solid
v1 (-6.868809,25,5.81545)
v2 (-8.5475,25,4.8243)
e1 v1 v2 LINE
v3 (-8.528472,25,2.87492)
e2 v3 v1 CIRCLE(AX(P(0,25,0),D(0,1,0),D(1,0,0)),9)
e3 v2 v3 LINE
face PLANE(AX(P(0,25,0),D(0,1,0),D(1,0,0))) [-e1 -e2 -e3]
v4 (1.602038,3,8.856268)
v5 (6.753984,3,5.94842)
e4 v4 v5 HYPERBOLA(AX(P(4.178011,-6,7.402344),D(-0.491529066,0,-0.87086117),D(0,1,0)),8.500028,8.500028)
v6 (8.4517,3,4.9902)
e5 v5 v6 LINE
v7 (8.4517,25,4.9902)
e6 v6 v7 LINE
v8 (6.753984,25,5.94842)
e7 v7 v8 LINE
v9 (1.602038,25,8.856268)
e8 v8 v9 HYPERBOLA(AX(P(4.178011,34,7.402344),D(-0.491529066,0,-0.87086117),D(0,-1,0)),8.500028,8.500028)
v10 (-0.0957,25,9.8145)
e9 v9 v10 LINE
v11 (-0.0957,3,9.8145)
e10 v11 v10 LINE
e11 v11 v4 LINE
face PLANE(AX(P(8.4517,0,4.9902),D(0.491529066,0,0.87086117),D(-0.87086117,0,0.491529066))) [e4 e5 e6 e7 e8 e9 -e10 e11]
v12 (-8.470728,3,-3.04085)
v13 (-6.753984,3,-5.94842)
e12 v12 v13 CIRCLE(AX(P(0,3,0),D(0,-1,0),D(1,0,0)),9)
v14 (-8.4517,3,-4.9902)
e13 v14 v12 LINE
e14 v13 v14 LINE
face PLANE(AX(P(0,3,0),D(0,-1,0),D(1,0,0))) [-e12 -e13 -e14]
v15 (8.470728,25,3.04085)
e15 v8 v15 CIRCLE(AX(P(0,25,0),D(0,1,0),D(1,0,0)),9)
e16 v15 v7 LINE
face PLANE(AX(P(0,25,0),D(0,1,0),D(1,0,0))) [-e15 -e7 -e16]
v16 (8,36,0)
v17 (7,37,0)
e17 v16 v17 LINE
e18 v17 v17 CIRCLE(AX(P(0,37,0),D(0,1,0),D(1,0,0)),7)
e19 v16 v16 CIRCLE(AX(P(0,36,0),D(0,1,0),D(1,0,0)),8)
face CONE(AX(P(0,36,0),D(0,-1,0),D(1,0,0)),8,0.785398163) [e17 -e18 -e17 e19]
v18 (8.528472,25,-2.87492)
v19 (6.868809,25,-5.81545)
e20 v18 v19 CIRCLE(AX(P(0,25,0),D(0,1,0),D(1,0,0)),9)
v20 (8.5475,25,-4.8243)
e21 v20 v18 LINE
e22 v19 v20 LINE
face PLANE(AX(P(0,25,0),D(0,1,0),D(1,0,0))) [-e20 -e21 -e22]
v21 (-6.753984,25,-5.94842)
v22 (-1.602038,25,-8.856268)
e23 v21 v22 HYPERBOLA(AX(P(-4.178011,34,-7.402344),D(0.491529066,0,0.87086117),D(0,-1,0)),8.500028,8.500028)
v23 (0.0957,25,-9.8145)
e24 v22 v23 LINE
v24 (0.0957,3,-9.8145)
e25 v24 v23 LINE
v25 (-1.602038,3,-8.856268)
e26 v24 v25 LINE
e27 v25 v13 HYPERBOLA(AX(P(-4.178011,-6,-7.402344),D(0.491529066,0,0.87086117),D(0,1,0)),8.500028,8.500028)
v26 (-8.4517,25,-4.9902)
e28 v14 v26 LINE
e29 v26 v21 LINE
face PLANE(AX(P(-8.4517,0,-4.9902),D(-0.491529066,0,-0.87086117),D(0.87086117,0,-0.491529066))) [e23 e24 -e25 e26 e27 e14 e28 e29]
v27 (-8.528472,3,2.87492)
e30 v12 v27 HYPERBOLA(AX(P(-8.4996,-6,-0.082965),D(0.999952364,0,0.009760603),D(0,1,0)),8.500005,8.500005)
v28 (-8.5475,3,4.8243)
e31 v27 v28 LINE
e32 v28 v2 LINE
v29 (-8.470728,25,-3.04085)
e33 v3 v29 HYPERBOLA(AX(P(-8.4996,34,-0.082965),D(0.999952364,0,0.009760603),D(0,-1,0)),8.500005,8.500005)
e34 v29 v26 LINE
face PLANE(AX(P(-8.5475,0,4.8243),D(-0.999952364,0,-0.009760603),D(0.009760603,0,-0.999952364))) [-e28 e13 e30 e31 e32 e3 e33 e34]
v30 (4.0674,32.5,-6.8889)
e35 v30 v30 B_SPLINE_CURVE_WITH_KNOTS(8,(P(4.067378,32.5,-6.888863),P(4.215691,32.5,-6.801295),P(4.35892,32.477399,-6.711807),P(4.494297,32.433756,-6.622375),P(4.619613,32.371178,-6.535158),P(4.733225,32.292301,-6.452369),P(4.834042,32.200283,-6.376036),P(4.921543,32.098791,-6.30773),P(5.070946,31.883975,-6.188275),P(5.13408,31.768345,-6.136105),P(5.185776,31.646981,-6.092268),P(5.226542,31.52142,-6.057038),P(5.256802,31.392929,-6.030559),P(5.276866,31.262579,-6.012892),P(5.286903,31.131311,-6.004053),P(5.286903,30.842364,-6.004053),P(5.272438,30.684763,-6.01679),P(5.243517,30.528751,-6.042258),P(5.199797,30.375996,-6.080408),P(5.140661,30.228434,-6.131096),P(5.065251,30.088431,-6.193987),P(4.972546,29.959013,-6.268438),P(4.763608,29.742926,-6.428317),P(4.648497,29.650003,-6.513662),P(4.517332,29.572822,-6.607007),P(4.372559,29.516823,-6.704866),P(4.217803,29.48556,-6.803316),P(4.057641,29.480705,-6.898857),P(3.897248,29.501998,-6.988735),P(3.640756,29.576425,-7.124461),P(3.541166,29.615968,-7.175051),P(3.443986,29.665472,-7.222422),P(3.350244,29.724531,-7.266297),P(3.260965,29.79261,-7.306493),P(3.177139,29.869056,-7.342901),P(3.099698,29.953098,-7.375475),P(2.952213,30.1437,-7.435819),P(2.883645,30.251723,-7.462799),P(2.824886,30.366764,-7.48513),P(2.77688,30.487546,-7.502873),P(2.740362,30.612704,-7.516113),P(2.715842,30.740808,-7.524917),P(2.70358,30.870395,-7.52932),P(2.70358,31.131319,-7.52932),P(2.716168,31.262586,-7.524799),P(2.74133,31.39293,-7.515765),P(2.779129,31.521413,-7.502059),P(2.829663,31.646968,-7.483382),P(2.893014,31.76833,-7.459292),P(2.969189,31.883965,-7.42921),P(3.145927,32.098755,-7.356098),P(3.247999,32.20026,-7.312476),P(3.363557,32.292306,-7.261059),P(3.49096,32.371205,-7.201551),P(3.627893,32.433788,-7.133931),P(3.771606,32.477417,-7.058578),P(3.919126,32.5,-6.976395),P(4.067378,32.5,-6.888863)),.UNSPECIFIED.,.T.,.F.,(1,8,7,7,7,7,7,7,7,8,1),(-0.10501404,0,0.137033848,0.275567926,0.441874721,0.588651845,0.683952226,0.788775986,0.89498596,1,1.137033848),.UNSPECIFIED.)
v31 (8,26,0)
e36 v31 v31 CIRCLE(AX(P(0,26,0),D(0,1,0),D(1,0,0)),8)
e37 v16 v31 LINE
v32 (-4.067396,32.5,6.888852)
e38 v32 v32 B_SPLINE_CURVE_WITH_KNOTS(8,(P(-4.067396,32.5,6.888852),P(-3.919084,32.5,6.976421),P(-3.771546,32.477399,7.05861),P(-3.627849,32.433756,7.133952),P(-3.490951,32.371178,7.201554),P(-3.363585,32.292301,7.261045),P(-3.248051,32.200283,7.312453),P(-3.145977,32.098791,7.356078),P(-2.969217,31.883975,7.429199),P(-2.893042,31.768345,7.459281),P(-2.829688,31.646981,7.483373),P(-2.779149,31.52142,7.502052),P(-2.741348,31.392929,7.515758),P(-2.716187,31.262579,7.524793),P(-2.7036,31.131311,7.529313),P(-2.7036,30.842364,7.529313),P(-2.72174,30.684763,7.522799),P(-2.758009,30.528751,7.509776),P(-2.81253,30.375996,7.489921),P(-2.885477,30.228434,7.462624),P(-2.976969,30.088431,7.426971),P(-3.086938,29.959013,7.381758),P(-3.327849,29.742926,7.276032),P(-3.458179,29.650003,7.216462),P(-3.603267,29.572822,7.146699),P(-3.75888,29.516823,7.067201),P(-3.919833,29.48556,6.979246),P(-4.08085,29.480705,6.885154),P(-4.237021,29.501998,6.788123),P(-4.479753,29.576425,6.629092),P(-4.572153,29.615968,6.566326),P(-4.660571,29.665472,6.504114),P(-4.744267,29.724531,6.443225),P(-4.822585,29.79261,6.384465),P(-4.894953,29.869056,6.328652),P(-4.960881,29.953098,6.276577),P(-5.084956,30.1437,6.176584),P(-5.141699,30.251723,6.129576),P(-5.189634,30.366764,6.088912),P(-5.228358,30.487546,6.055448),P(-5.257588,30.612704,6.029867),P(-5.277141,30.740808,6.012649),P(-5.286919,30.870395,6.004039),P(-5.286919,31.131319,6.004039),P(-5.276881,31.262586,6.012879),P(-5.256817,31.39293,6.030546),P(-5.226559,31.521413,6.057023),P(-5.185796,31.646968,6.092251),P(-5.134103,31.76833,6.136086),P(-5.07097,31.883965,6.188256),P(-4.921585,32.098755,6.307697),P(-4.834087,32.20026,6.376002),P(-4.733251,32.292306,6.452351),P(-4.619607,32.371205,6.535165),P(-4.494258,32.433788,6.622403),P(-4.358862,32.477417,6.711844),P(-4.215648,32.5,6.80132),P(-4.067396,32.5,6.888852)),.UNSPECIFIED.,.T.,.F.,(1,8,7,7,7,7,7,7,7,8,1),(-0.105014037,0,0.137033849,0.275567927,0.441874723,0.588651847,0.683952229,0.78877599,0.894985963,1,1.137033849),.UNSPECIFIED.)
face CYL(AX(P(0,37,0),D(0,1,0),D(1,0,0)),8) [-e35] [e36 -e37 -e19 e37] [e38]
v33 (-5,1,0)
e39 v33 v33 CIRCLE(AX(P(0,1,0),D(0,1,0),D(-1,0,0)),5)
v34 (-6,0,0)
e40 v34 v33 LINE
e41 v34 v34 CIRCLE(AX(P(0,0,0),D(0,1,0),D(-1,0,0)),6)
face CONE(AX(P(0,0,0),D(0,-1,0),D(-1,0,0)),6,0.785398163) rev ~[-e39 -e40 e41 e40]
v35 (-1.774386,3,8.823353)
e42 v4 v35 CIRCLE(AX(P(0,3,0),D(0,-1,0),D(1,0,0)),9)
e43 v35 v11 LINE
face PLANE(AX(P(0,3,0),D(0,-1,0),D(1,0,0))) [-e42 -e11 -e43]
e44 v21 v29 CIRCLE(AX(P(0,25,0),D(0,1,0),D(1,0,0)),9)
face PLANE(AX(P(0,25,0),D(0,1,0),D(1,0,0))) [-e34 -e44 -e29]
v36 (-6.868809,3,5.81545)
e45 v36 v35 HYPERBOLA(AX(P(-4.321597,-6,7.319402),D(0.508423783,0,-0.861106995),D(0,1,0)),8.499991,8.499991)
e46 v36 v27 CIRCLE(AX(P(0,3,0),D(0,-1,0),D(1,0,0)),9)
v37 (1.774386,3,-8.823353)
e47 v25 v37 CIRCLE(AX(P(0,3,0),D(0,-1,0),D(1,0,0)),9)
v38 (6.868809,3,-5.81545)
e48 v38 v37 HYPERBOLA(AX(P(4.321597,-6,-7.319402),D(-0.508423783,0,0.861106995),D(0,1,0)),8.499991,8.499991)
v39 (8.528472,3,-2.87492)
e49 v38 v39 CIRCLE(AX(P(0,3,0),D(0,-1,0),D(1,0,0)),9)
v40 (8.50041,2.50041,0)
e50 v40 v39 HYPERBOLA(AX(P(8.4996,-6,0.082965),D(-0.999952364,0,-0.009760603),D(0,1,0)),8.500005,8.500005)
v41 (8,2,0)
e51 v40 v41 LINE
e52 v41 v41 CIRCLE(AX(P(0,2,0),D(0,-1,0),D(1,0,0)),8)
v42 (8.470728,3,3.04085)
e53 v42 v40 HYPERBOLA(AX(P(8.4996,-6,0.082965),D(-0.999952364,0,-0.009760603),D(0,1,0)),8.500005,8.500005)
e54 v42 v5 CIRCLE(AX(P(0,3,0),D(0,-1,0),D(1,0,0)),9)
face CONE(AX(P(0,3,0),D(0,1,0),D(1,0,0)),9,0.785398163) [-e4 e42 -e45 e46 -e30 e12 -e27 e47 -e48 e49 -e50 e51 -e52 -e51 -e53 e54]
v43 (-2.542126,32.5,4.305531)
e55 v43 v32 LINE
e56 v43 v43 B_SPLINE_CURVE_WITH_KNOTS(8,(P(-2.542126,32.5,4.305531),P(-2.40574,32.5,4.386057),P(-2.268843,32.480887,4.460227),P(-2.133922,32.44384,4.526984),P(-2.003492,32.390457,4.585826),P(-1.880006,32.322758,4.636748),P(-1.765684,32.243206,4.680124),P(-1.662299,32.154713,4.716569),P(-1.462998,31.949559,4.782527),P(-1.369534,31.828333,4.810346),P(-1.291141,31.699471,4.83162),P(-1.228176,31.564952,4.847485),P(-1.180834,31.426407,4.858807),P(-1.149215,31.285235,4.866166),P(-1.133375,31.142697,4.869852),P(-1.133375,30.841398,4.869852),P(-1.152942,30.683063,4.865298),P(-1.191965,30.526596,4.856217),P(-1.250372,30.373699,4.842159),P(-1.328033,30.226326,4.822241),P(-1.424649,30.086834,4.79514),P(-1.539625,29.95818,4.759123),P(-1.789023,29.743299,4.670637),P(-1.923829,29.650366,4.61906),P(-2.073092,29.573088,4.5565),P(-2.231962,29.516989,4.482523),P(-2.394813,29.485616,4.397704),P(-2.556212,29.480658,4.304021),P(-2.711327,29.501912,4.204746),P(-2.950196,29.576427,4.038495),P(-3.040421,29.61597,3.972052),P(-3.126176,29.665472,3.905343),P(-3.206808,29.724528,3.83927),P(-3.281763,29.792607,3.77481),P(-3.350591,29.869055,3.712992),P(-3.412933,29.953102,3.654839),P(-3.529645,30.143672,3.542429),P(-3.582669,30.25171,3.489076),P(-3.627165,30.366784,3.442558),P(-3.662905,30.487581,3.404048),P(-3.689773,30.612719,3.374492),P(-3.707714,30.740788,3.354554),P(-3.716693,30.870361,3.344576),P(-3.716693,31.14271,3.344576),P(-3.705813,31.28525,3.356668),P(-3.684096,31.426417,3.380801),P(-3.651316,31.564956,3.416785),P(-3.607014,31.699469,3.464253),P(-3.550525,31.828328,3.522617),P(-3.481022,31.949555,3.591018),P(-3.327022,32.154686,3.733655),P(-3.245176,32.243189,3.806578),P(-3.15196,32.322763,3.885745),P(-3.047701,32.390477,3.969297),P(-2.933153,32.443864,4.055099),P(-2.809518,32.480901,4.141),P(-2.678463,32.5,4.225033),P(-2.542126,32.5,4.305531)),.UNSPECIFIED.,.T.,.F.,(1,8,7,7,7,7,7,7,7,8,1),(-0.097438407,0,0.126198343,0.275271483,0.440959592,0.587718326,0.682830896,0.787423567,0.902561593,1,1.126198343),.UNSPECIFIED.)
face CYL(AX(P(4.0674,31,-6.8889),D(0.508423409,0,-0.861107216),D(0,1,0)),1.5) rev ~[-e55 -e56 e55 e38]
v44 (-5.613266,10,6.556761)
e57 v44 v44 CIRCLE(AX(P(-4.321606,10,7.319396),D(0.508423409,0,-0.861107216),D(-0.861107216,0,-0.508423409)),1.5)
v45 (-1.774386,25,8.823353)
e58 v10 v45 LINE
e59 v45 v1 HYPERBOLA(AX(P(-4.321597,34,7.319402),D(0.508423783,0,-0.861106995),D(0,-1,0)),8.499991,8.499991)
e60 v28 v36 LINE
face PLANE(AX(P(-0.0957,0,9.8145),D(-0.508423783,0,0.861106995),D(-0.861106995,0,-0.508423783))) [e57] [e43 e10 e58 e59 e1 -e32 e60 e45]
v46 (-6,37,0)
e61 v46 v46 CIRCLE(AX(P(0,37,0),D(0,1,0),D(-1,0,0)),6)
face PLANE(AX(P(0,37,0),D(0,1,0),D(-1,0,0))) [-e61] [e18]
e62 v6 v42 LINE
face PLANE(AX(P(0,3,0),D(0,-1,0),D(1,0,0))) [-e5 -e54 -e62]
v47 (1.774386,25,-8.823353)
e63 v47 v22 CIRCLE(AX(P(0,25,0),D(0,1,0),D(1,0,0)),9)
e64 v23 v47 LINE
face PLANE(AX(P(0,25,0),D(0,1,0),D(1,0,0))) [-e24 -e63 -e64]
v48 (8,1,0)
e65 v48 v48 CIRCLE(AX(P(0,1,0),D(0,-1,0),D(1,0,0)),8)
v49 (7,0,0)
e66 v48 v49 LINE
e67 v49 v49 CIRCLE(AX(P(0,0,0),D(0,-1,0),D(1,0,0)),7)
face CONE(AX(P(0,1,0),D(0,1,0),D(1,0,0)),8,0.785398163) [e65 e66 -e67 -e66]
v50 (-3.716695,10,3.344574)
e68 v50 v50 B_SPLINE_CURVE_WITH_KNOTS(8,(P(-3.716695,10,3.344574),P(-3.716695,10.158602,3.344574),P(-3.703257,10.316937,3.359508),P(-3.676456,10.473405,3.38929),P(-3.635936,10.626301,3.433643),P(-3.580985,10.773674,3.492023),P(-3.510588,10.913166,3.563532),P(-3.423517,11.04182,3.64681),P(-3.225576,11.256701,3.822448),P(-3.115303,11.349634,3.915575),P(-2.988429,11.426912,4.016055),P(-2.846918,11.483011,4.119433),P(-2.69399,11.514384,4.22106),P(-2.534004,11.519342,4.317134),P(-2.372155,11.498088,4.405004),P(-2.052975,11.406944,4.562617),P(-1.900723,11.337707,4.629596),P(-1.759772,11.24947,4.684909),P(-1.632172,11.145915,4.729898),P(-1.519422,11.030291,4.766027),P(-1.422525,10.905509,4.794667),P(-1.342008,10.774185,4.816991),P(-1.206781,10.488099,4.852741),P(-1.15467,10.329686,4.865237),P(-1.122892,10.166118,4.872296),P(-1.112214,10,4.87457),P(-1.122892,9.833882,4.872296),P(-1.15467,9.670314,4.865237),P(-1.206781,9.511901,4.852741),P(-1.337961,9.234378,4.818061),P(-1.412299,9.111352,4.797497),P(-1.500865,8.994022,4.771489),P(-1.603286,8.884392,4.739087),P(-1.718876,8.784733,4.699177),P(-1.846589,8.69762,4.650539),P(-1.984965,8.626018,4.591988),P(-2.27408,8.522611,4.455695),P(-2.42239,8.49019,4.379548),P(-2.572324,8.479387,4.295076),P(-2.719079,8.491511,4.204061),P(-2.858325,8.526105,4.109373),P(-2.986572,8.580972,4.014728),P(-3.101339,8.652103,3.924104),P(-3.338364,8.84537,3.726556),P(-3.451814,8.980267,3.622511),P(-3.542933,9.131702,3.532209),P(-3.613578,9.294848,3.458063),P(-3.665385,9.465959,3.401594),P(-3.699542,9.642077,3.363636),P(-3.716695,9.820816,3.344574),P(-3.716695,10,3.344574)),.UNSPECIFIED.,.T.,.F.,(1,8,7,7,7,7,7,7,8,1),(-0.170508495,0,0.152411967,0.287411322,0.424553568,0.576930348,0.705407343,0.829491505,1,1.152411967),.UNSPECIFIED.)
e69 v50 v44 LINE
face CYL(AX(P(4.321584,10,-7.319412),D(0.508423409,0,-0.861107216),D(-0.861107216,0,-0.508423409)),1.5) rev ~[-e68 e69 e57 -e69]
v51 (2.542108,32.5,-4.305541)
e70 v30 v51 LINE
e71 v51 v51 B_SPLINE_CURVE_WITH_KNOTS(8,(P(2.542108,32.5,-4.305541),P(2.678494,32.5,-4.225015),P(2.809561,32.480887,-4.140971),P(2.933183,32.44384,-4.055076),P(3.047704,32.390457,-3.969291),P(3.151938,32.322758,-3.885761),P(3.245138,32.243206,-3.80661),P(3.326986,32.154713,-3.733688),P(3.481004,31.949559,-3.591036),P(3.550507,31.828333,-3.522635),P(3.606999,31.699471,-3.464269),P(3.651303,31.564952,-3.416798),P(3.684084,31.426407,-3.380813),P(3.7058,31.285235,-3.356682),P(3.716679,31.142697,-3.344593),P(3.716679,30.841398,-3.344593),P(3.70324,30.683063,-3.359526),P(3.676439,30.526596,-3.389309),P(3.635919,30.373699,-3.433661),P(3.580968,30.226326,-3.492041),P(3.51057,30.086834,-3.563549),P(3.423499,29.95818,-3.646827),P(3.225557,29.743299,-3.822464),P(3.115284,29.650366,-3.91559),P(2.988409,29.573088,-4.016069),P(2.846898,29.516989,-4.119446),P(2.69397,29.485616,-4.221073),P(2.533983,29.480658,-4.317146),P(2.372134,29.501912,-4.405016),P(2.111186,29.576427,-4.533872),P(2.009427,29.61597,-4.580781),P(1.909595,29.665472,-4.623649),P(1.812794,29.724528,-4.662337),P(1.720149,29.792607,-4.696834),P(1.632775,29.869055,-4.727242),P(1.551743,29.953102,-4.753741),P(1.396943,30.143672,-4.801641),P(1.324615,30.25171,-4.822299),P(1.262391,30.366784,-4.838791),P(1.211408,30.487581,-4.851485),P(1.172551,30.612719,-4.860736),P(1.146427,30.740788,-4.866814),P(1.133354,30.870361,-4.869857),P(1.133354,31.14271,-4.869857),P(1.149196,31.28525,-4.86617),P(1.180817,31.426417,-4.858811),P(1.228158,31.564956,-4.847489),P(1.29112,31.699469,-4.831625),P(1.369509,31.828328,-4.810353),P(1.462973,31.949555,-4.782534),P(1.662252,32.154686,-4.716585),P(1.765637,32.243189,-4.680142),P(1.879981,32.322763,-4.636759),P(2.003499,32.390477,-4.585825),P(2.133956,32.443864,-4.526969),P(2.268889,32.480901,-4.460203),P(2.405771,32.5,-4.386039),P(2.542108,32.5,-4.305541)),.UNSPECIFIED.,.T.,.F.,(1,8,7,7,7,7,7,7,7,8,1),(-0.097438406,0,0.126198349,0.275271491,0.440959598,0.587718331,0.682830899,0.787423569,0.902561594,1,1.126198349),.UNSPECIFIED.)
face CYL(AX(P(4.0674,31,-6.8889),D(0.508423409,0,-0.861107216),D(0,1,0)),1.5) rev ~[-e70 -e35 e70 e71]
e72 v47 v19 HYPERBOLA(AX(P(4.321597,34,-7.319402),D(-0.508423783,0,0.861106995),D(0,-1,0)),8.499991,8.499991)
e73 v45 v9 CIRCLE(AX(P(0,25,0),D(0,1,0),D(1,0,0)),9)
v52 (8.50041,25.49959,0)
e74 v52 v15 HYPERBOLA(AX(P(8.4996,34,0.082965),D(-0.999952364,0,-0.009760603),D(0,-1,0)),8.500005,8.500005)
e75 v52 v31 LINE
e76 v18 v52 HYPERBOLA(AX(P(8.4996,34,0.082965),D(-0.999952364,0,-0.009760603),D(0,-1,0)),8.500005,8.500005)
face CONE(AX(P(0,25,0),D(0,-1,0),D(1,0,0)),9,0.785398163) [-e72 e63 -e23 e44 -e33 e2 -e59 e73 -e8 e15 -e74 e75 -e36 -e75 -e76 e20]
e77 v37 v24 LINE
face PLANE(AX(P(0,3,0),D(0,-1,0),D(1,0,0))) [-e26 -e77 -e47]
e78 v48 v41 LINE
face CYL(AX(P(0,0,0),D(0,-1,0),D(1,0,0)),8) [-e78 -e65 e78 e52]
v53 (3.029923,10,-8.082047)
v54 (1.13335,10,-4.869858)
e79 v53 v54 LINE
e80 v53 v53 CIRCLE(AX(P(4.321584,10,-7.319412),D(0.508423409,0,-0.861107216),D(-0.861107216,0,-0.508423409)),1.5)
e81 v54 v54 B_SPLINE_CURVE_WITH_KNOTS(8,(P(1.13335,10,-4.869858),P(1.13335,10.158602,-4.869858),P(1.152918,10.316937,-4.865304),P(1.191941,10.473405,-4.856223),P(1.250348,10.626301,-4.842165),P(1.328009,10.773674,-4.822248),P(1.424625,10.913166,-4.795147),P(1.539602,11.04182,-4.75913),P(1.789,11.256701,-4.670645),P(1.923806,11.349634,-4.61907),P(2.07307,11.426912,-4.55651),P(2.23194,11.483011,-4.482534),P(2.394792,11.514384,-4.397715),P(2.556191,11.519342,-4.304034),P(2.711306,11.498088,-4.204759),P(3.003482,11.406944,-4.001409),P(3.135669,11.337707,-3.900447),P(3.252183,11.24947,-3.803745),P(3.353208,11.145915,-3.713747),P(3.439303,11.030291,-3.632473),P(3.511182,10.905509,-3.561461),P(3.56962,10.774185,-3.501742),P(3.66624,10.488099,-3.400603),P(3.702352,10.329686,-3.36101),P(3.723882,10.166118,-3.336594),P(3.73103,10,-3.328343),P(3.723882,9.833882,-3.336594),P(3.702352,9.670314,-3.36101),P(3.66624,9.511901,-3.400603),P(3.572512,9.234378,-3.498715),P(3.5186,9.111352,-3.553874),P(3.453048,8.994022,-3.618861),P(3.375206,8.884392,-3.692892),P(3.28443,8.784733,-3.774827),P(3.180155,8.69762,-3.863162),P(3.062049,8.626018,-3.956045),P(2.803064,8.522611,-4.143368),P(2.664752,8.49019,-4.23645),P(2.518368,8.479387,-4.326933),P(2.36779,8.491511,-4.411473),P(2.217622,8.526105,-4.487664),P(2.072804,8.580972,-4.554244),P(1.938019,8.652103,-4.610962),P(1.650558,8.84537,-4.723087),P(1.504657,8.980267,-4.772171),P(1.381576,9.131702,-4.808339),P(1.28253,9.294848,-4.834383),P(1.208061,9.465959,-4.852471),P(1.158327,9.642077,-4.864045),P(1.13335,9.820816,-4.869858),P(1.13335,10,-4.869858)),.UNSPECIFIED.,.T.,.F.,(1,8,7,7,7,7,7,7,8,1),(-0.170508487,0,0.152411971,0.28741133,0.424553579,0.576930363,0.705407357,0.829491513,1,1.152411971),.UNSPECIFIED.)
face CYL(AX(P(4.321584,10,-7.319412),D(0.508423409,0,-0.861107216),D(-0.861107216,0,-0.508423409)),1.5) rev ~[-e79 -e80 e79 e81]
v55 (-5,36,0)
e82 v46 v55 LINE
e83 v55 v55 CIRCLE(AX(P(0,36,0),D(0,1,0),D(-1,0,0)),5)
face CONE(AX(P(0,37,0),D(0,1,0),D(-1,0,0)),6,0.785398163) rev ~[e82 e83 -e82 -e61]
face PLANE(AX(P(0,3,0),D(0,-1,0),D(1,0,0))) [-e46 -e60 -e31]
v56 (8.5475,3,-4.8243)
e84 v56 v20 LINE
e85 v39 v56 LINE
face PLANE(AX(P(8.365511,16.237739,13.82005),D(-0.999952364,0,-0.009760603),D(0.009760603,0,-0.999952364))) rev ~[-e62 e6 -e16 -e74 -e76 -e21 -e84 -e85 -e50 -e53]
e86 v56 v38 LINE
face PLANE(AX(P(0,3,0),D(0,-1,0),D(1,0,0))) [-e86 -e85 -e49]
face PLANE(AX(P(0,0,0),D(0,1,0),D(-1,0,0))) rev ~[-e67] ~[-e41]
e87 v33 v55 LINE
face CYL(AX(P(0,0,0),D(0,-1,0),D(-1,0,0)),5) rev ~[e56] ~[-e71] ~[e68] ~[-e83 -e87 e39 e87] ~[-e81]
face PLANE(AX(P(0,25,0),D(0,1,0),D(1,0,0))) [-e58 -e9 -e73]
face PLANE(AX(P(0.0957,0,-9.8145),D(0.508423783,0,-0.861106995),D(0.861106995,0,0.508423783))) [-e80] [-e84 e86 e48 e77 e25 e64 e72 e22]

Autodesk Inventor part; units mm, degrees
ref_plane "YZ Plane" through (0, 0, 0) normal (1, 0, 0) x (0, 1, 0)
ref_plane "XZ Plane" through (0, 0, 0) normal (0, 1, 0) x (-1, 0, 0)
ref_plane "XY Plane" through (0, 0, 0) normal (0, 0, 1) x (1, 0, 0)
sketch "Sketch1" plane through (0, 0, 0) normal (0, 1, 0) x (-1, 0, 0)
  line L0 (8.5475, 4.8243) -> (8.4517, -4.9902)
  line L1 (8.4517, -4.9902) -> (-0.0957, -9.8145)
  line L2 (-0.0957, -9.8145) -> (-8.5475, -4.8243)
  line L3 (-8.5475, -4.8243) -> (-8.4517, 4.9902)
  line L4 (-8.4517, 4.9902) -> (0.0957, 9.8145)
  line L5 (0.0957, 9.8145) -> (8.5475, 4.8243)
  circle A0 centre (0, 0) radius 5
  dimension "d0" = 17
  dimension "d1" = 10
extrude "Extrusion1" add sketch "Sketch1" along normal blind 37
sketch "Sketch2" plane through (0, 37, 0) normal (0, 1, 0) x (1, 0, 0)
  circle A0 centre (0, 0) radius 8
  circle A1 centre (0, 0) radius 13
  dimension "d4" = 16
  dimension "d5" = 5
extrude "Extrusion2" cut sketch "Sketch2" against normal blind 12
sketch "Sketch3" plane through (0, 0, 0) normal (0, -1, 0) x (1, 0, 0)
  circle A0 centre (0, 0) radius 8
  circle A1 centre (0, 0) radius 13
  dimension "d9" = 16
  dimension "d10" = 5
extrude "Extrusion3" cut sketch "Sketch3" against normal blind 3
chamfer "Chamfer1" distance 1 angle 45 6 edges at (-8, 3, 0) (-8, 0, 0) (5, 0, 0) (-8, 25, 0) (-8, 37, 0) (5, 37, 0)
ref_plane "Work Plane1" through (0, 31, 0) normal (0, 1, 0) x (1, 0, 0)
sketch "Sketch4" plane through (0, 31, 0) normal (0, 1, 0) x (1, 0, 0)
  line L0 (0, 0) -> (3.9142, 6.6294)
  line L1 (0.0957, 9.8145) -> (0, 0)
  point P0 (8.5475, 4.8243)
  dimension "d20" = 30
ref_plane "Work Plane3" through (4.0674, 31, -6.8889) normal (0.5084234, 0, -0.8611072) x (0, 1, 0)
sketch "Sketch6" plane through (4.0674, 31, -6.8889) normal (0.5084234, 0, -0.8611072) x (0, 1, 0)
  circle A0 centre (0, 0) radius 1.5
  point P0 (-31, 0)
  dimension "d16" = 3
extrude "Extrusion4" cut sketch "Sketch6" against normal through all
sketch "Sketch9" plane through (0.0957, 3, -9.8145) normal (0.5084234, 0, -0.8611072) x (-0.8611072, 0, -0.5084234)
  circle A0 centre (-4.9075, 7) radius 1.5
  line L0 (-9.815, 0) -> (-9.815, 22) projected
  line L1 (0, 0) -> (0, 22) projected
  point P0 (-4.9075, -3)
  dimension "d31" = 3
  dimension "d32" = 9.8149
  dimension "d33" = 4.9075
  dimension "d34" = 10
extrude "Extrusion5" cut sketch "Sketch9" against normal through all
thread "Thread2" size "M10x1.5" class "6H" standard "ANSI Metric M Profile" length 20
equation "\"d33\" = 0.5 * d32"
properties part number "AnyaKicsi"
